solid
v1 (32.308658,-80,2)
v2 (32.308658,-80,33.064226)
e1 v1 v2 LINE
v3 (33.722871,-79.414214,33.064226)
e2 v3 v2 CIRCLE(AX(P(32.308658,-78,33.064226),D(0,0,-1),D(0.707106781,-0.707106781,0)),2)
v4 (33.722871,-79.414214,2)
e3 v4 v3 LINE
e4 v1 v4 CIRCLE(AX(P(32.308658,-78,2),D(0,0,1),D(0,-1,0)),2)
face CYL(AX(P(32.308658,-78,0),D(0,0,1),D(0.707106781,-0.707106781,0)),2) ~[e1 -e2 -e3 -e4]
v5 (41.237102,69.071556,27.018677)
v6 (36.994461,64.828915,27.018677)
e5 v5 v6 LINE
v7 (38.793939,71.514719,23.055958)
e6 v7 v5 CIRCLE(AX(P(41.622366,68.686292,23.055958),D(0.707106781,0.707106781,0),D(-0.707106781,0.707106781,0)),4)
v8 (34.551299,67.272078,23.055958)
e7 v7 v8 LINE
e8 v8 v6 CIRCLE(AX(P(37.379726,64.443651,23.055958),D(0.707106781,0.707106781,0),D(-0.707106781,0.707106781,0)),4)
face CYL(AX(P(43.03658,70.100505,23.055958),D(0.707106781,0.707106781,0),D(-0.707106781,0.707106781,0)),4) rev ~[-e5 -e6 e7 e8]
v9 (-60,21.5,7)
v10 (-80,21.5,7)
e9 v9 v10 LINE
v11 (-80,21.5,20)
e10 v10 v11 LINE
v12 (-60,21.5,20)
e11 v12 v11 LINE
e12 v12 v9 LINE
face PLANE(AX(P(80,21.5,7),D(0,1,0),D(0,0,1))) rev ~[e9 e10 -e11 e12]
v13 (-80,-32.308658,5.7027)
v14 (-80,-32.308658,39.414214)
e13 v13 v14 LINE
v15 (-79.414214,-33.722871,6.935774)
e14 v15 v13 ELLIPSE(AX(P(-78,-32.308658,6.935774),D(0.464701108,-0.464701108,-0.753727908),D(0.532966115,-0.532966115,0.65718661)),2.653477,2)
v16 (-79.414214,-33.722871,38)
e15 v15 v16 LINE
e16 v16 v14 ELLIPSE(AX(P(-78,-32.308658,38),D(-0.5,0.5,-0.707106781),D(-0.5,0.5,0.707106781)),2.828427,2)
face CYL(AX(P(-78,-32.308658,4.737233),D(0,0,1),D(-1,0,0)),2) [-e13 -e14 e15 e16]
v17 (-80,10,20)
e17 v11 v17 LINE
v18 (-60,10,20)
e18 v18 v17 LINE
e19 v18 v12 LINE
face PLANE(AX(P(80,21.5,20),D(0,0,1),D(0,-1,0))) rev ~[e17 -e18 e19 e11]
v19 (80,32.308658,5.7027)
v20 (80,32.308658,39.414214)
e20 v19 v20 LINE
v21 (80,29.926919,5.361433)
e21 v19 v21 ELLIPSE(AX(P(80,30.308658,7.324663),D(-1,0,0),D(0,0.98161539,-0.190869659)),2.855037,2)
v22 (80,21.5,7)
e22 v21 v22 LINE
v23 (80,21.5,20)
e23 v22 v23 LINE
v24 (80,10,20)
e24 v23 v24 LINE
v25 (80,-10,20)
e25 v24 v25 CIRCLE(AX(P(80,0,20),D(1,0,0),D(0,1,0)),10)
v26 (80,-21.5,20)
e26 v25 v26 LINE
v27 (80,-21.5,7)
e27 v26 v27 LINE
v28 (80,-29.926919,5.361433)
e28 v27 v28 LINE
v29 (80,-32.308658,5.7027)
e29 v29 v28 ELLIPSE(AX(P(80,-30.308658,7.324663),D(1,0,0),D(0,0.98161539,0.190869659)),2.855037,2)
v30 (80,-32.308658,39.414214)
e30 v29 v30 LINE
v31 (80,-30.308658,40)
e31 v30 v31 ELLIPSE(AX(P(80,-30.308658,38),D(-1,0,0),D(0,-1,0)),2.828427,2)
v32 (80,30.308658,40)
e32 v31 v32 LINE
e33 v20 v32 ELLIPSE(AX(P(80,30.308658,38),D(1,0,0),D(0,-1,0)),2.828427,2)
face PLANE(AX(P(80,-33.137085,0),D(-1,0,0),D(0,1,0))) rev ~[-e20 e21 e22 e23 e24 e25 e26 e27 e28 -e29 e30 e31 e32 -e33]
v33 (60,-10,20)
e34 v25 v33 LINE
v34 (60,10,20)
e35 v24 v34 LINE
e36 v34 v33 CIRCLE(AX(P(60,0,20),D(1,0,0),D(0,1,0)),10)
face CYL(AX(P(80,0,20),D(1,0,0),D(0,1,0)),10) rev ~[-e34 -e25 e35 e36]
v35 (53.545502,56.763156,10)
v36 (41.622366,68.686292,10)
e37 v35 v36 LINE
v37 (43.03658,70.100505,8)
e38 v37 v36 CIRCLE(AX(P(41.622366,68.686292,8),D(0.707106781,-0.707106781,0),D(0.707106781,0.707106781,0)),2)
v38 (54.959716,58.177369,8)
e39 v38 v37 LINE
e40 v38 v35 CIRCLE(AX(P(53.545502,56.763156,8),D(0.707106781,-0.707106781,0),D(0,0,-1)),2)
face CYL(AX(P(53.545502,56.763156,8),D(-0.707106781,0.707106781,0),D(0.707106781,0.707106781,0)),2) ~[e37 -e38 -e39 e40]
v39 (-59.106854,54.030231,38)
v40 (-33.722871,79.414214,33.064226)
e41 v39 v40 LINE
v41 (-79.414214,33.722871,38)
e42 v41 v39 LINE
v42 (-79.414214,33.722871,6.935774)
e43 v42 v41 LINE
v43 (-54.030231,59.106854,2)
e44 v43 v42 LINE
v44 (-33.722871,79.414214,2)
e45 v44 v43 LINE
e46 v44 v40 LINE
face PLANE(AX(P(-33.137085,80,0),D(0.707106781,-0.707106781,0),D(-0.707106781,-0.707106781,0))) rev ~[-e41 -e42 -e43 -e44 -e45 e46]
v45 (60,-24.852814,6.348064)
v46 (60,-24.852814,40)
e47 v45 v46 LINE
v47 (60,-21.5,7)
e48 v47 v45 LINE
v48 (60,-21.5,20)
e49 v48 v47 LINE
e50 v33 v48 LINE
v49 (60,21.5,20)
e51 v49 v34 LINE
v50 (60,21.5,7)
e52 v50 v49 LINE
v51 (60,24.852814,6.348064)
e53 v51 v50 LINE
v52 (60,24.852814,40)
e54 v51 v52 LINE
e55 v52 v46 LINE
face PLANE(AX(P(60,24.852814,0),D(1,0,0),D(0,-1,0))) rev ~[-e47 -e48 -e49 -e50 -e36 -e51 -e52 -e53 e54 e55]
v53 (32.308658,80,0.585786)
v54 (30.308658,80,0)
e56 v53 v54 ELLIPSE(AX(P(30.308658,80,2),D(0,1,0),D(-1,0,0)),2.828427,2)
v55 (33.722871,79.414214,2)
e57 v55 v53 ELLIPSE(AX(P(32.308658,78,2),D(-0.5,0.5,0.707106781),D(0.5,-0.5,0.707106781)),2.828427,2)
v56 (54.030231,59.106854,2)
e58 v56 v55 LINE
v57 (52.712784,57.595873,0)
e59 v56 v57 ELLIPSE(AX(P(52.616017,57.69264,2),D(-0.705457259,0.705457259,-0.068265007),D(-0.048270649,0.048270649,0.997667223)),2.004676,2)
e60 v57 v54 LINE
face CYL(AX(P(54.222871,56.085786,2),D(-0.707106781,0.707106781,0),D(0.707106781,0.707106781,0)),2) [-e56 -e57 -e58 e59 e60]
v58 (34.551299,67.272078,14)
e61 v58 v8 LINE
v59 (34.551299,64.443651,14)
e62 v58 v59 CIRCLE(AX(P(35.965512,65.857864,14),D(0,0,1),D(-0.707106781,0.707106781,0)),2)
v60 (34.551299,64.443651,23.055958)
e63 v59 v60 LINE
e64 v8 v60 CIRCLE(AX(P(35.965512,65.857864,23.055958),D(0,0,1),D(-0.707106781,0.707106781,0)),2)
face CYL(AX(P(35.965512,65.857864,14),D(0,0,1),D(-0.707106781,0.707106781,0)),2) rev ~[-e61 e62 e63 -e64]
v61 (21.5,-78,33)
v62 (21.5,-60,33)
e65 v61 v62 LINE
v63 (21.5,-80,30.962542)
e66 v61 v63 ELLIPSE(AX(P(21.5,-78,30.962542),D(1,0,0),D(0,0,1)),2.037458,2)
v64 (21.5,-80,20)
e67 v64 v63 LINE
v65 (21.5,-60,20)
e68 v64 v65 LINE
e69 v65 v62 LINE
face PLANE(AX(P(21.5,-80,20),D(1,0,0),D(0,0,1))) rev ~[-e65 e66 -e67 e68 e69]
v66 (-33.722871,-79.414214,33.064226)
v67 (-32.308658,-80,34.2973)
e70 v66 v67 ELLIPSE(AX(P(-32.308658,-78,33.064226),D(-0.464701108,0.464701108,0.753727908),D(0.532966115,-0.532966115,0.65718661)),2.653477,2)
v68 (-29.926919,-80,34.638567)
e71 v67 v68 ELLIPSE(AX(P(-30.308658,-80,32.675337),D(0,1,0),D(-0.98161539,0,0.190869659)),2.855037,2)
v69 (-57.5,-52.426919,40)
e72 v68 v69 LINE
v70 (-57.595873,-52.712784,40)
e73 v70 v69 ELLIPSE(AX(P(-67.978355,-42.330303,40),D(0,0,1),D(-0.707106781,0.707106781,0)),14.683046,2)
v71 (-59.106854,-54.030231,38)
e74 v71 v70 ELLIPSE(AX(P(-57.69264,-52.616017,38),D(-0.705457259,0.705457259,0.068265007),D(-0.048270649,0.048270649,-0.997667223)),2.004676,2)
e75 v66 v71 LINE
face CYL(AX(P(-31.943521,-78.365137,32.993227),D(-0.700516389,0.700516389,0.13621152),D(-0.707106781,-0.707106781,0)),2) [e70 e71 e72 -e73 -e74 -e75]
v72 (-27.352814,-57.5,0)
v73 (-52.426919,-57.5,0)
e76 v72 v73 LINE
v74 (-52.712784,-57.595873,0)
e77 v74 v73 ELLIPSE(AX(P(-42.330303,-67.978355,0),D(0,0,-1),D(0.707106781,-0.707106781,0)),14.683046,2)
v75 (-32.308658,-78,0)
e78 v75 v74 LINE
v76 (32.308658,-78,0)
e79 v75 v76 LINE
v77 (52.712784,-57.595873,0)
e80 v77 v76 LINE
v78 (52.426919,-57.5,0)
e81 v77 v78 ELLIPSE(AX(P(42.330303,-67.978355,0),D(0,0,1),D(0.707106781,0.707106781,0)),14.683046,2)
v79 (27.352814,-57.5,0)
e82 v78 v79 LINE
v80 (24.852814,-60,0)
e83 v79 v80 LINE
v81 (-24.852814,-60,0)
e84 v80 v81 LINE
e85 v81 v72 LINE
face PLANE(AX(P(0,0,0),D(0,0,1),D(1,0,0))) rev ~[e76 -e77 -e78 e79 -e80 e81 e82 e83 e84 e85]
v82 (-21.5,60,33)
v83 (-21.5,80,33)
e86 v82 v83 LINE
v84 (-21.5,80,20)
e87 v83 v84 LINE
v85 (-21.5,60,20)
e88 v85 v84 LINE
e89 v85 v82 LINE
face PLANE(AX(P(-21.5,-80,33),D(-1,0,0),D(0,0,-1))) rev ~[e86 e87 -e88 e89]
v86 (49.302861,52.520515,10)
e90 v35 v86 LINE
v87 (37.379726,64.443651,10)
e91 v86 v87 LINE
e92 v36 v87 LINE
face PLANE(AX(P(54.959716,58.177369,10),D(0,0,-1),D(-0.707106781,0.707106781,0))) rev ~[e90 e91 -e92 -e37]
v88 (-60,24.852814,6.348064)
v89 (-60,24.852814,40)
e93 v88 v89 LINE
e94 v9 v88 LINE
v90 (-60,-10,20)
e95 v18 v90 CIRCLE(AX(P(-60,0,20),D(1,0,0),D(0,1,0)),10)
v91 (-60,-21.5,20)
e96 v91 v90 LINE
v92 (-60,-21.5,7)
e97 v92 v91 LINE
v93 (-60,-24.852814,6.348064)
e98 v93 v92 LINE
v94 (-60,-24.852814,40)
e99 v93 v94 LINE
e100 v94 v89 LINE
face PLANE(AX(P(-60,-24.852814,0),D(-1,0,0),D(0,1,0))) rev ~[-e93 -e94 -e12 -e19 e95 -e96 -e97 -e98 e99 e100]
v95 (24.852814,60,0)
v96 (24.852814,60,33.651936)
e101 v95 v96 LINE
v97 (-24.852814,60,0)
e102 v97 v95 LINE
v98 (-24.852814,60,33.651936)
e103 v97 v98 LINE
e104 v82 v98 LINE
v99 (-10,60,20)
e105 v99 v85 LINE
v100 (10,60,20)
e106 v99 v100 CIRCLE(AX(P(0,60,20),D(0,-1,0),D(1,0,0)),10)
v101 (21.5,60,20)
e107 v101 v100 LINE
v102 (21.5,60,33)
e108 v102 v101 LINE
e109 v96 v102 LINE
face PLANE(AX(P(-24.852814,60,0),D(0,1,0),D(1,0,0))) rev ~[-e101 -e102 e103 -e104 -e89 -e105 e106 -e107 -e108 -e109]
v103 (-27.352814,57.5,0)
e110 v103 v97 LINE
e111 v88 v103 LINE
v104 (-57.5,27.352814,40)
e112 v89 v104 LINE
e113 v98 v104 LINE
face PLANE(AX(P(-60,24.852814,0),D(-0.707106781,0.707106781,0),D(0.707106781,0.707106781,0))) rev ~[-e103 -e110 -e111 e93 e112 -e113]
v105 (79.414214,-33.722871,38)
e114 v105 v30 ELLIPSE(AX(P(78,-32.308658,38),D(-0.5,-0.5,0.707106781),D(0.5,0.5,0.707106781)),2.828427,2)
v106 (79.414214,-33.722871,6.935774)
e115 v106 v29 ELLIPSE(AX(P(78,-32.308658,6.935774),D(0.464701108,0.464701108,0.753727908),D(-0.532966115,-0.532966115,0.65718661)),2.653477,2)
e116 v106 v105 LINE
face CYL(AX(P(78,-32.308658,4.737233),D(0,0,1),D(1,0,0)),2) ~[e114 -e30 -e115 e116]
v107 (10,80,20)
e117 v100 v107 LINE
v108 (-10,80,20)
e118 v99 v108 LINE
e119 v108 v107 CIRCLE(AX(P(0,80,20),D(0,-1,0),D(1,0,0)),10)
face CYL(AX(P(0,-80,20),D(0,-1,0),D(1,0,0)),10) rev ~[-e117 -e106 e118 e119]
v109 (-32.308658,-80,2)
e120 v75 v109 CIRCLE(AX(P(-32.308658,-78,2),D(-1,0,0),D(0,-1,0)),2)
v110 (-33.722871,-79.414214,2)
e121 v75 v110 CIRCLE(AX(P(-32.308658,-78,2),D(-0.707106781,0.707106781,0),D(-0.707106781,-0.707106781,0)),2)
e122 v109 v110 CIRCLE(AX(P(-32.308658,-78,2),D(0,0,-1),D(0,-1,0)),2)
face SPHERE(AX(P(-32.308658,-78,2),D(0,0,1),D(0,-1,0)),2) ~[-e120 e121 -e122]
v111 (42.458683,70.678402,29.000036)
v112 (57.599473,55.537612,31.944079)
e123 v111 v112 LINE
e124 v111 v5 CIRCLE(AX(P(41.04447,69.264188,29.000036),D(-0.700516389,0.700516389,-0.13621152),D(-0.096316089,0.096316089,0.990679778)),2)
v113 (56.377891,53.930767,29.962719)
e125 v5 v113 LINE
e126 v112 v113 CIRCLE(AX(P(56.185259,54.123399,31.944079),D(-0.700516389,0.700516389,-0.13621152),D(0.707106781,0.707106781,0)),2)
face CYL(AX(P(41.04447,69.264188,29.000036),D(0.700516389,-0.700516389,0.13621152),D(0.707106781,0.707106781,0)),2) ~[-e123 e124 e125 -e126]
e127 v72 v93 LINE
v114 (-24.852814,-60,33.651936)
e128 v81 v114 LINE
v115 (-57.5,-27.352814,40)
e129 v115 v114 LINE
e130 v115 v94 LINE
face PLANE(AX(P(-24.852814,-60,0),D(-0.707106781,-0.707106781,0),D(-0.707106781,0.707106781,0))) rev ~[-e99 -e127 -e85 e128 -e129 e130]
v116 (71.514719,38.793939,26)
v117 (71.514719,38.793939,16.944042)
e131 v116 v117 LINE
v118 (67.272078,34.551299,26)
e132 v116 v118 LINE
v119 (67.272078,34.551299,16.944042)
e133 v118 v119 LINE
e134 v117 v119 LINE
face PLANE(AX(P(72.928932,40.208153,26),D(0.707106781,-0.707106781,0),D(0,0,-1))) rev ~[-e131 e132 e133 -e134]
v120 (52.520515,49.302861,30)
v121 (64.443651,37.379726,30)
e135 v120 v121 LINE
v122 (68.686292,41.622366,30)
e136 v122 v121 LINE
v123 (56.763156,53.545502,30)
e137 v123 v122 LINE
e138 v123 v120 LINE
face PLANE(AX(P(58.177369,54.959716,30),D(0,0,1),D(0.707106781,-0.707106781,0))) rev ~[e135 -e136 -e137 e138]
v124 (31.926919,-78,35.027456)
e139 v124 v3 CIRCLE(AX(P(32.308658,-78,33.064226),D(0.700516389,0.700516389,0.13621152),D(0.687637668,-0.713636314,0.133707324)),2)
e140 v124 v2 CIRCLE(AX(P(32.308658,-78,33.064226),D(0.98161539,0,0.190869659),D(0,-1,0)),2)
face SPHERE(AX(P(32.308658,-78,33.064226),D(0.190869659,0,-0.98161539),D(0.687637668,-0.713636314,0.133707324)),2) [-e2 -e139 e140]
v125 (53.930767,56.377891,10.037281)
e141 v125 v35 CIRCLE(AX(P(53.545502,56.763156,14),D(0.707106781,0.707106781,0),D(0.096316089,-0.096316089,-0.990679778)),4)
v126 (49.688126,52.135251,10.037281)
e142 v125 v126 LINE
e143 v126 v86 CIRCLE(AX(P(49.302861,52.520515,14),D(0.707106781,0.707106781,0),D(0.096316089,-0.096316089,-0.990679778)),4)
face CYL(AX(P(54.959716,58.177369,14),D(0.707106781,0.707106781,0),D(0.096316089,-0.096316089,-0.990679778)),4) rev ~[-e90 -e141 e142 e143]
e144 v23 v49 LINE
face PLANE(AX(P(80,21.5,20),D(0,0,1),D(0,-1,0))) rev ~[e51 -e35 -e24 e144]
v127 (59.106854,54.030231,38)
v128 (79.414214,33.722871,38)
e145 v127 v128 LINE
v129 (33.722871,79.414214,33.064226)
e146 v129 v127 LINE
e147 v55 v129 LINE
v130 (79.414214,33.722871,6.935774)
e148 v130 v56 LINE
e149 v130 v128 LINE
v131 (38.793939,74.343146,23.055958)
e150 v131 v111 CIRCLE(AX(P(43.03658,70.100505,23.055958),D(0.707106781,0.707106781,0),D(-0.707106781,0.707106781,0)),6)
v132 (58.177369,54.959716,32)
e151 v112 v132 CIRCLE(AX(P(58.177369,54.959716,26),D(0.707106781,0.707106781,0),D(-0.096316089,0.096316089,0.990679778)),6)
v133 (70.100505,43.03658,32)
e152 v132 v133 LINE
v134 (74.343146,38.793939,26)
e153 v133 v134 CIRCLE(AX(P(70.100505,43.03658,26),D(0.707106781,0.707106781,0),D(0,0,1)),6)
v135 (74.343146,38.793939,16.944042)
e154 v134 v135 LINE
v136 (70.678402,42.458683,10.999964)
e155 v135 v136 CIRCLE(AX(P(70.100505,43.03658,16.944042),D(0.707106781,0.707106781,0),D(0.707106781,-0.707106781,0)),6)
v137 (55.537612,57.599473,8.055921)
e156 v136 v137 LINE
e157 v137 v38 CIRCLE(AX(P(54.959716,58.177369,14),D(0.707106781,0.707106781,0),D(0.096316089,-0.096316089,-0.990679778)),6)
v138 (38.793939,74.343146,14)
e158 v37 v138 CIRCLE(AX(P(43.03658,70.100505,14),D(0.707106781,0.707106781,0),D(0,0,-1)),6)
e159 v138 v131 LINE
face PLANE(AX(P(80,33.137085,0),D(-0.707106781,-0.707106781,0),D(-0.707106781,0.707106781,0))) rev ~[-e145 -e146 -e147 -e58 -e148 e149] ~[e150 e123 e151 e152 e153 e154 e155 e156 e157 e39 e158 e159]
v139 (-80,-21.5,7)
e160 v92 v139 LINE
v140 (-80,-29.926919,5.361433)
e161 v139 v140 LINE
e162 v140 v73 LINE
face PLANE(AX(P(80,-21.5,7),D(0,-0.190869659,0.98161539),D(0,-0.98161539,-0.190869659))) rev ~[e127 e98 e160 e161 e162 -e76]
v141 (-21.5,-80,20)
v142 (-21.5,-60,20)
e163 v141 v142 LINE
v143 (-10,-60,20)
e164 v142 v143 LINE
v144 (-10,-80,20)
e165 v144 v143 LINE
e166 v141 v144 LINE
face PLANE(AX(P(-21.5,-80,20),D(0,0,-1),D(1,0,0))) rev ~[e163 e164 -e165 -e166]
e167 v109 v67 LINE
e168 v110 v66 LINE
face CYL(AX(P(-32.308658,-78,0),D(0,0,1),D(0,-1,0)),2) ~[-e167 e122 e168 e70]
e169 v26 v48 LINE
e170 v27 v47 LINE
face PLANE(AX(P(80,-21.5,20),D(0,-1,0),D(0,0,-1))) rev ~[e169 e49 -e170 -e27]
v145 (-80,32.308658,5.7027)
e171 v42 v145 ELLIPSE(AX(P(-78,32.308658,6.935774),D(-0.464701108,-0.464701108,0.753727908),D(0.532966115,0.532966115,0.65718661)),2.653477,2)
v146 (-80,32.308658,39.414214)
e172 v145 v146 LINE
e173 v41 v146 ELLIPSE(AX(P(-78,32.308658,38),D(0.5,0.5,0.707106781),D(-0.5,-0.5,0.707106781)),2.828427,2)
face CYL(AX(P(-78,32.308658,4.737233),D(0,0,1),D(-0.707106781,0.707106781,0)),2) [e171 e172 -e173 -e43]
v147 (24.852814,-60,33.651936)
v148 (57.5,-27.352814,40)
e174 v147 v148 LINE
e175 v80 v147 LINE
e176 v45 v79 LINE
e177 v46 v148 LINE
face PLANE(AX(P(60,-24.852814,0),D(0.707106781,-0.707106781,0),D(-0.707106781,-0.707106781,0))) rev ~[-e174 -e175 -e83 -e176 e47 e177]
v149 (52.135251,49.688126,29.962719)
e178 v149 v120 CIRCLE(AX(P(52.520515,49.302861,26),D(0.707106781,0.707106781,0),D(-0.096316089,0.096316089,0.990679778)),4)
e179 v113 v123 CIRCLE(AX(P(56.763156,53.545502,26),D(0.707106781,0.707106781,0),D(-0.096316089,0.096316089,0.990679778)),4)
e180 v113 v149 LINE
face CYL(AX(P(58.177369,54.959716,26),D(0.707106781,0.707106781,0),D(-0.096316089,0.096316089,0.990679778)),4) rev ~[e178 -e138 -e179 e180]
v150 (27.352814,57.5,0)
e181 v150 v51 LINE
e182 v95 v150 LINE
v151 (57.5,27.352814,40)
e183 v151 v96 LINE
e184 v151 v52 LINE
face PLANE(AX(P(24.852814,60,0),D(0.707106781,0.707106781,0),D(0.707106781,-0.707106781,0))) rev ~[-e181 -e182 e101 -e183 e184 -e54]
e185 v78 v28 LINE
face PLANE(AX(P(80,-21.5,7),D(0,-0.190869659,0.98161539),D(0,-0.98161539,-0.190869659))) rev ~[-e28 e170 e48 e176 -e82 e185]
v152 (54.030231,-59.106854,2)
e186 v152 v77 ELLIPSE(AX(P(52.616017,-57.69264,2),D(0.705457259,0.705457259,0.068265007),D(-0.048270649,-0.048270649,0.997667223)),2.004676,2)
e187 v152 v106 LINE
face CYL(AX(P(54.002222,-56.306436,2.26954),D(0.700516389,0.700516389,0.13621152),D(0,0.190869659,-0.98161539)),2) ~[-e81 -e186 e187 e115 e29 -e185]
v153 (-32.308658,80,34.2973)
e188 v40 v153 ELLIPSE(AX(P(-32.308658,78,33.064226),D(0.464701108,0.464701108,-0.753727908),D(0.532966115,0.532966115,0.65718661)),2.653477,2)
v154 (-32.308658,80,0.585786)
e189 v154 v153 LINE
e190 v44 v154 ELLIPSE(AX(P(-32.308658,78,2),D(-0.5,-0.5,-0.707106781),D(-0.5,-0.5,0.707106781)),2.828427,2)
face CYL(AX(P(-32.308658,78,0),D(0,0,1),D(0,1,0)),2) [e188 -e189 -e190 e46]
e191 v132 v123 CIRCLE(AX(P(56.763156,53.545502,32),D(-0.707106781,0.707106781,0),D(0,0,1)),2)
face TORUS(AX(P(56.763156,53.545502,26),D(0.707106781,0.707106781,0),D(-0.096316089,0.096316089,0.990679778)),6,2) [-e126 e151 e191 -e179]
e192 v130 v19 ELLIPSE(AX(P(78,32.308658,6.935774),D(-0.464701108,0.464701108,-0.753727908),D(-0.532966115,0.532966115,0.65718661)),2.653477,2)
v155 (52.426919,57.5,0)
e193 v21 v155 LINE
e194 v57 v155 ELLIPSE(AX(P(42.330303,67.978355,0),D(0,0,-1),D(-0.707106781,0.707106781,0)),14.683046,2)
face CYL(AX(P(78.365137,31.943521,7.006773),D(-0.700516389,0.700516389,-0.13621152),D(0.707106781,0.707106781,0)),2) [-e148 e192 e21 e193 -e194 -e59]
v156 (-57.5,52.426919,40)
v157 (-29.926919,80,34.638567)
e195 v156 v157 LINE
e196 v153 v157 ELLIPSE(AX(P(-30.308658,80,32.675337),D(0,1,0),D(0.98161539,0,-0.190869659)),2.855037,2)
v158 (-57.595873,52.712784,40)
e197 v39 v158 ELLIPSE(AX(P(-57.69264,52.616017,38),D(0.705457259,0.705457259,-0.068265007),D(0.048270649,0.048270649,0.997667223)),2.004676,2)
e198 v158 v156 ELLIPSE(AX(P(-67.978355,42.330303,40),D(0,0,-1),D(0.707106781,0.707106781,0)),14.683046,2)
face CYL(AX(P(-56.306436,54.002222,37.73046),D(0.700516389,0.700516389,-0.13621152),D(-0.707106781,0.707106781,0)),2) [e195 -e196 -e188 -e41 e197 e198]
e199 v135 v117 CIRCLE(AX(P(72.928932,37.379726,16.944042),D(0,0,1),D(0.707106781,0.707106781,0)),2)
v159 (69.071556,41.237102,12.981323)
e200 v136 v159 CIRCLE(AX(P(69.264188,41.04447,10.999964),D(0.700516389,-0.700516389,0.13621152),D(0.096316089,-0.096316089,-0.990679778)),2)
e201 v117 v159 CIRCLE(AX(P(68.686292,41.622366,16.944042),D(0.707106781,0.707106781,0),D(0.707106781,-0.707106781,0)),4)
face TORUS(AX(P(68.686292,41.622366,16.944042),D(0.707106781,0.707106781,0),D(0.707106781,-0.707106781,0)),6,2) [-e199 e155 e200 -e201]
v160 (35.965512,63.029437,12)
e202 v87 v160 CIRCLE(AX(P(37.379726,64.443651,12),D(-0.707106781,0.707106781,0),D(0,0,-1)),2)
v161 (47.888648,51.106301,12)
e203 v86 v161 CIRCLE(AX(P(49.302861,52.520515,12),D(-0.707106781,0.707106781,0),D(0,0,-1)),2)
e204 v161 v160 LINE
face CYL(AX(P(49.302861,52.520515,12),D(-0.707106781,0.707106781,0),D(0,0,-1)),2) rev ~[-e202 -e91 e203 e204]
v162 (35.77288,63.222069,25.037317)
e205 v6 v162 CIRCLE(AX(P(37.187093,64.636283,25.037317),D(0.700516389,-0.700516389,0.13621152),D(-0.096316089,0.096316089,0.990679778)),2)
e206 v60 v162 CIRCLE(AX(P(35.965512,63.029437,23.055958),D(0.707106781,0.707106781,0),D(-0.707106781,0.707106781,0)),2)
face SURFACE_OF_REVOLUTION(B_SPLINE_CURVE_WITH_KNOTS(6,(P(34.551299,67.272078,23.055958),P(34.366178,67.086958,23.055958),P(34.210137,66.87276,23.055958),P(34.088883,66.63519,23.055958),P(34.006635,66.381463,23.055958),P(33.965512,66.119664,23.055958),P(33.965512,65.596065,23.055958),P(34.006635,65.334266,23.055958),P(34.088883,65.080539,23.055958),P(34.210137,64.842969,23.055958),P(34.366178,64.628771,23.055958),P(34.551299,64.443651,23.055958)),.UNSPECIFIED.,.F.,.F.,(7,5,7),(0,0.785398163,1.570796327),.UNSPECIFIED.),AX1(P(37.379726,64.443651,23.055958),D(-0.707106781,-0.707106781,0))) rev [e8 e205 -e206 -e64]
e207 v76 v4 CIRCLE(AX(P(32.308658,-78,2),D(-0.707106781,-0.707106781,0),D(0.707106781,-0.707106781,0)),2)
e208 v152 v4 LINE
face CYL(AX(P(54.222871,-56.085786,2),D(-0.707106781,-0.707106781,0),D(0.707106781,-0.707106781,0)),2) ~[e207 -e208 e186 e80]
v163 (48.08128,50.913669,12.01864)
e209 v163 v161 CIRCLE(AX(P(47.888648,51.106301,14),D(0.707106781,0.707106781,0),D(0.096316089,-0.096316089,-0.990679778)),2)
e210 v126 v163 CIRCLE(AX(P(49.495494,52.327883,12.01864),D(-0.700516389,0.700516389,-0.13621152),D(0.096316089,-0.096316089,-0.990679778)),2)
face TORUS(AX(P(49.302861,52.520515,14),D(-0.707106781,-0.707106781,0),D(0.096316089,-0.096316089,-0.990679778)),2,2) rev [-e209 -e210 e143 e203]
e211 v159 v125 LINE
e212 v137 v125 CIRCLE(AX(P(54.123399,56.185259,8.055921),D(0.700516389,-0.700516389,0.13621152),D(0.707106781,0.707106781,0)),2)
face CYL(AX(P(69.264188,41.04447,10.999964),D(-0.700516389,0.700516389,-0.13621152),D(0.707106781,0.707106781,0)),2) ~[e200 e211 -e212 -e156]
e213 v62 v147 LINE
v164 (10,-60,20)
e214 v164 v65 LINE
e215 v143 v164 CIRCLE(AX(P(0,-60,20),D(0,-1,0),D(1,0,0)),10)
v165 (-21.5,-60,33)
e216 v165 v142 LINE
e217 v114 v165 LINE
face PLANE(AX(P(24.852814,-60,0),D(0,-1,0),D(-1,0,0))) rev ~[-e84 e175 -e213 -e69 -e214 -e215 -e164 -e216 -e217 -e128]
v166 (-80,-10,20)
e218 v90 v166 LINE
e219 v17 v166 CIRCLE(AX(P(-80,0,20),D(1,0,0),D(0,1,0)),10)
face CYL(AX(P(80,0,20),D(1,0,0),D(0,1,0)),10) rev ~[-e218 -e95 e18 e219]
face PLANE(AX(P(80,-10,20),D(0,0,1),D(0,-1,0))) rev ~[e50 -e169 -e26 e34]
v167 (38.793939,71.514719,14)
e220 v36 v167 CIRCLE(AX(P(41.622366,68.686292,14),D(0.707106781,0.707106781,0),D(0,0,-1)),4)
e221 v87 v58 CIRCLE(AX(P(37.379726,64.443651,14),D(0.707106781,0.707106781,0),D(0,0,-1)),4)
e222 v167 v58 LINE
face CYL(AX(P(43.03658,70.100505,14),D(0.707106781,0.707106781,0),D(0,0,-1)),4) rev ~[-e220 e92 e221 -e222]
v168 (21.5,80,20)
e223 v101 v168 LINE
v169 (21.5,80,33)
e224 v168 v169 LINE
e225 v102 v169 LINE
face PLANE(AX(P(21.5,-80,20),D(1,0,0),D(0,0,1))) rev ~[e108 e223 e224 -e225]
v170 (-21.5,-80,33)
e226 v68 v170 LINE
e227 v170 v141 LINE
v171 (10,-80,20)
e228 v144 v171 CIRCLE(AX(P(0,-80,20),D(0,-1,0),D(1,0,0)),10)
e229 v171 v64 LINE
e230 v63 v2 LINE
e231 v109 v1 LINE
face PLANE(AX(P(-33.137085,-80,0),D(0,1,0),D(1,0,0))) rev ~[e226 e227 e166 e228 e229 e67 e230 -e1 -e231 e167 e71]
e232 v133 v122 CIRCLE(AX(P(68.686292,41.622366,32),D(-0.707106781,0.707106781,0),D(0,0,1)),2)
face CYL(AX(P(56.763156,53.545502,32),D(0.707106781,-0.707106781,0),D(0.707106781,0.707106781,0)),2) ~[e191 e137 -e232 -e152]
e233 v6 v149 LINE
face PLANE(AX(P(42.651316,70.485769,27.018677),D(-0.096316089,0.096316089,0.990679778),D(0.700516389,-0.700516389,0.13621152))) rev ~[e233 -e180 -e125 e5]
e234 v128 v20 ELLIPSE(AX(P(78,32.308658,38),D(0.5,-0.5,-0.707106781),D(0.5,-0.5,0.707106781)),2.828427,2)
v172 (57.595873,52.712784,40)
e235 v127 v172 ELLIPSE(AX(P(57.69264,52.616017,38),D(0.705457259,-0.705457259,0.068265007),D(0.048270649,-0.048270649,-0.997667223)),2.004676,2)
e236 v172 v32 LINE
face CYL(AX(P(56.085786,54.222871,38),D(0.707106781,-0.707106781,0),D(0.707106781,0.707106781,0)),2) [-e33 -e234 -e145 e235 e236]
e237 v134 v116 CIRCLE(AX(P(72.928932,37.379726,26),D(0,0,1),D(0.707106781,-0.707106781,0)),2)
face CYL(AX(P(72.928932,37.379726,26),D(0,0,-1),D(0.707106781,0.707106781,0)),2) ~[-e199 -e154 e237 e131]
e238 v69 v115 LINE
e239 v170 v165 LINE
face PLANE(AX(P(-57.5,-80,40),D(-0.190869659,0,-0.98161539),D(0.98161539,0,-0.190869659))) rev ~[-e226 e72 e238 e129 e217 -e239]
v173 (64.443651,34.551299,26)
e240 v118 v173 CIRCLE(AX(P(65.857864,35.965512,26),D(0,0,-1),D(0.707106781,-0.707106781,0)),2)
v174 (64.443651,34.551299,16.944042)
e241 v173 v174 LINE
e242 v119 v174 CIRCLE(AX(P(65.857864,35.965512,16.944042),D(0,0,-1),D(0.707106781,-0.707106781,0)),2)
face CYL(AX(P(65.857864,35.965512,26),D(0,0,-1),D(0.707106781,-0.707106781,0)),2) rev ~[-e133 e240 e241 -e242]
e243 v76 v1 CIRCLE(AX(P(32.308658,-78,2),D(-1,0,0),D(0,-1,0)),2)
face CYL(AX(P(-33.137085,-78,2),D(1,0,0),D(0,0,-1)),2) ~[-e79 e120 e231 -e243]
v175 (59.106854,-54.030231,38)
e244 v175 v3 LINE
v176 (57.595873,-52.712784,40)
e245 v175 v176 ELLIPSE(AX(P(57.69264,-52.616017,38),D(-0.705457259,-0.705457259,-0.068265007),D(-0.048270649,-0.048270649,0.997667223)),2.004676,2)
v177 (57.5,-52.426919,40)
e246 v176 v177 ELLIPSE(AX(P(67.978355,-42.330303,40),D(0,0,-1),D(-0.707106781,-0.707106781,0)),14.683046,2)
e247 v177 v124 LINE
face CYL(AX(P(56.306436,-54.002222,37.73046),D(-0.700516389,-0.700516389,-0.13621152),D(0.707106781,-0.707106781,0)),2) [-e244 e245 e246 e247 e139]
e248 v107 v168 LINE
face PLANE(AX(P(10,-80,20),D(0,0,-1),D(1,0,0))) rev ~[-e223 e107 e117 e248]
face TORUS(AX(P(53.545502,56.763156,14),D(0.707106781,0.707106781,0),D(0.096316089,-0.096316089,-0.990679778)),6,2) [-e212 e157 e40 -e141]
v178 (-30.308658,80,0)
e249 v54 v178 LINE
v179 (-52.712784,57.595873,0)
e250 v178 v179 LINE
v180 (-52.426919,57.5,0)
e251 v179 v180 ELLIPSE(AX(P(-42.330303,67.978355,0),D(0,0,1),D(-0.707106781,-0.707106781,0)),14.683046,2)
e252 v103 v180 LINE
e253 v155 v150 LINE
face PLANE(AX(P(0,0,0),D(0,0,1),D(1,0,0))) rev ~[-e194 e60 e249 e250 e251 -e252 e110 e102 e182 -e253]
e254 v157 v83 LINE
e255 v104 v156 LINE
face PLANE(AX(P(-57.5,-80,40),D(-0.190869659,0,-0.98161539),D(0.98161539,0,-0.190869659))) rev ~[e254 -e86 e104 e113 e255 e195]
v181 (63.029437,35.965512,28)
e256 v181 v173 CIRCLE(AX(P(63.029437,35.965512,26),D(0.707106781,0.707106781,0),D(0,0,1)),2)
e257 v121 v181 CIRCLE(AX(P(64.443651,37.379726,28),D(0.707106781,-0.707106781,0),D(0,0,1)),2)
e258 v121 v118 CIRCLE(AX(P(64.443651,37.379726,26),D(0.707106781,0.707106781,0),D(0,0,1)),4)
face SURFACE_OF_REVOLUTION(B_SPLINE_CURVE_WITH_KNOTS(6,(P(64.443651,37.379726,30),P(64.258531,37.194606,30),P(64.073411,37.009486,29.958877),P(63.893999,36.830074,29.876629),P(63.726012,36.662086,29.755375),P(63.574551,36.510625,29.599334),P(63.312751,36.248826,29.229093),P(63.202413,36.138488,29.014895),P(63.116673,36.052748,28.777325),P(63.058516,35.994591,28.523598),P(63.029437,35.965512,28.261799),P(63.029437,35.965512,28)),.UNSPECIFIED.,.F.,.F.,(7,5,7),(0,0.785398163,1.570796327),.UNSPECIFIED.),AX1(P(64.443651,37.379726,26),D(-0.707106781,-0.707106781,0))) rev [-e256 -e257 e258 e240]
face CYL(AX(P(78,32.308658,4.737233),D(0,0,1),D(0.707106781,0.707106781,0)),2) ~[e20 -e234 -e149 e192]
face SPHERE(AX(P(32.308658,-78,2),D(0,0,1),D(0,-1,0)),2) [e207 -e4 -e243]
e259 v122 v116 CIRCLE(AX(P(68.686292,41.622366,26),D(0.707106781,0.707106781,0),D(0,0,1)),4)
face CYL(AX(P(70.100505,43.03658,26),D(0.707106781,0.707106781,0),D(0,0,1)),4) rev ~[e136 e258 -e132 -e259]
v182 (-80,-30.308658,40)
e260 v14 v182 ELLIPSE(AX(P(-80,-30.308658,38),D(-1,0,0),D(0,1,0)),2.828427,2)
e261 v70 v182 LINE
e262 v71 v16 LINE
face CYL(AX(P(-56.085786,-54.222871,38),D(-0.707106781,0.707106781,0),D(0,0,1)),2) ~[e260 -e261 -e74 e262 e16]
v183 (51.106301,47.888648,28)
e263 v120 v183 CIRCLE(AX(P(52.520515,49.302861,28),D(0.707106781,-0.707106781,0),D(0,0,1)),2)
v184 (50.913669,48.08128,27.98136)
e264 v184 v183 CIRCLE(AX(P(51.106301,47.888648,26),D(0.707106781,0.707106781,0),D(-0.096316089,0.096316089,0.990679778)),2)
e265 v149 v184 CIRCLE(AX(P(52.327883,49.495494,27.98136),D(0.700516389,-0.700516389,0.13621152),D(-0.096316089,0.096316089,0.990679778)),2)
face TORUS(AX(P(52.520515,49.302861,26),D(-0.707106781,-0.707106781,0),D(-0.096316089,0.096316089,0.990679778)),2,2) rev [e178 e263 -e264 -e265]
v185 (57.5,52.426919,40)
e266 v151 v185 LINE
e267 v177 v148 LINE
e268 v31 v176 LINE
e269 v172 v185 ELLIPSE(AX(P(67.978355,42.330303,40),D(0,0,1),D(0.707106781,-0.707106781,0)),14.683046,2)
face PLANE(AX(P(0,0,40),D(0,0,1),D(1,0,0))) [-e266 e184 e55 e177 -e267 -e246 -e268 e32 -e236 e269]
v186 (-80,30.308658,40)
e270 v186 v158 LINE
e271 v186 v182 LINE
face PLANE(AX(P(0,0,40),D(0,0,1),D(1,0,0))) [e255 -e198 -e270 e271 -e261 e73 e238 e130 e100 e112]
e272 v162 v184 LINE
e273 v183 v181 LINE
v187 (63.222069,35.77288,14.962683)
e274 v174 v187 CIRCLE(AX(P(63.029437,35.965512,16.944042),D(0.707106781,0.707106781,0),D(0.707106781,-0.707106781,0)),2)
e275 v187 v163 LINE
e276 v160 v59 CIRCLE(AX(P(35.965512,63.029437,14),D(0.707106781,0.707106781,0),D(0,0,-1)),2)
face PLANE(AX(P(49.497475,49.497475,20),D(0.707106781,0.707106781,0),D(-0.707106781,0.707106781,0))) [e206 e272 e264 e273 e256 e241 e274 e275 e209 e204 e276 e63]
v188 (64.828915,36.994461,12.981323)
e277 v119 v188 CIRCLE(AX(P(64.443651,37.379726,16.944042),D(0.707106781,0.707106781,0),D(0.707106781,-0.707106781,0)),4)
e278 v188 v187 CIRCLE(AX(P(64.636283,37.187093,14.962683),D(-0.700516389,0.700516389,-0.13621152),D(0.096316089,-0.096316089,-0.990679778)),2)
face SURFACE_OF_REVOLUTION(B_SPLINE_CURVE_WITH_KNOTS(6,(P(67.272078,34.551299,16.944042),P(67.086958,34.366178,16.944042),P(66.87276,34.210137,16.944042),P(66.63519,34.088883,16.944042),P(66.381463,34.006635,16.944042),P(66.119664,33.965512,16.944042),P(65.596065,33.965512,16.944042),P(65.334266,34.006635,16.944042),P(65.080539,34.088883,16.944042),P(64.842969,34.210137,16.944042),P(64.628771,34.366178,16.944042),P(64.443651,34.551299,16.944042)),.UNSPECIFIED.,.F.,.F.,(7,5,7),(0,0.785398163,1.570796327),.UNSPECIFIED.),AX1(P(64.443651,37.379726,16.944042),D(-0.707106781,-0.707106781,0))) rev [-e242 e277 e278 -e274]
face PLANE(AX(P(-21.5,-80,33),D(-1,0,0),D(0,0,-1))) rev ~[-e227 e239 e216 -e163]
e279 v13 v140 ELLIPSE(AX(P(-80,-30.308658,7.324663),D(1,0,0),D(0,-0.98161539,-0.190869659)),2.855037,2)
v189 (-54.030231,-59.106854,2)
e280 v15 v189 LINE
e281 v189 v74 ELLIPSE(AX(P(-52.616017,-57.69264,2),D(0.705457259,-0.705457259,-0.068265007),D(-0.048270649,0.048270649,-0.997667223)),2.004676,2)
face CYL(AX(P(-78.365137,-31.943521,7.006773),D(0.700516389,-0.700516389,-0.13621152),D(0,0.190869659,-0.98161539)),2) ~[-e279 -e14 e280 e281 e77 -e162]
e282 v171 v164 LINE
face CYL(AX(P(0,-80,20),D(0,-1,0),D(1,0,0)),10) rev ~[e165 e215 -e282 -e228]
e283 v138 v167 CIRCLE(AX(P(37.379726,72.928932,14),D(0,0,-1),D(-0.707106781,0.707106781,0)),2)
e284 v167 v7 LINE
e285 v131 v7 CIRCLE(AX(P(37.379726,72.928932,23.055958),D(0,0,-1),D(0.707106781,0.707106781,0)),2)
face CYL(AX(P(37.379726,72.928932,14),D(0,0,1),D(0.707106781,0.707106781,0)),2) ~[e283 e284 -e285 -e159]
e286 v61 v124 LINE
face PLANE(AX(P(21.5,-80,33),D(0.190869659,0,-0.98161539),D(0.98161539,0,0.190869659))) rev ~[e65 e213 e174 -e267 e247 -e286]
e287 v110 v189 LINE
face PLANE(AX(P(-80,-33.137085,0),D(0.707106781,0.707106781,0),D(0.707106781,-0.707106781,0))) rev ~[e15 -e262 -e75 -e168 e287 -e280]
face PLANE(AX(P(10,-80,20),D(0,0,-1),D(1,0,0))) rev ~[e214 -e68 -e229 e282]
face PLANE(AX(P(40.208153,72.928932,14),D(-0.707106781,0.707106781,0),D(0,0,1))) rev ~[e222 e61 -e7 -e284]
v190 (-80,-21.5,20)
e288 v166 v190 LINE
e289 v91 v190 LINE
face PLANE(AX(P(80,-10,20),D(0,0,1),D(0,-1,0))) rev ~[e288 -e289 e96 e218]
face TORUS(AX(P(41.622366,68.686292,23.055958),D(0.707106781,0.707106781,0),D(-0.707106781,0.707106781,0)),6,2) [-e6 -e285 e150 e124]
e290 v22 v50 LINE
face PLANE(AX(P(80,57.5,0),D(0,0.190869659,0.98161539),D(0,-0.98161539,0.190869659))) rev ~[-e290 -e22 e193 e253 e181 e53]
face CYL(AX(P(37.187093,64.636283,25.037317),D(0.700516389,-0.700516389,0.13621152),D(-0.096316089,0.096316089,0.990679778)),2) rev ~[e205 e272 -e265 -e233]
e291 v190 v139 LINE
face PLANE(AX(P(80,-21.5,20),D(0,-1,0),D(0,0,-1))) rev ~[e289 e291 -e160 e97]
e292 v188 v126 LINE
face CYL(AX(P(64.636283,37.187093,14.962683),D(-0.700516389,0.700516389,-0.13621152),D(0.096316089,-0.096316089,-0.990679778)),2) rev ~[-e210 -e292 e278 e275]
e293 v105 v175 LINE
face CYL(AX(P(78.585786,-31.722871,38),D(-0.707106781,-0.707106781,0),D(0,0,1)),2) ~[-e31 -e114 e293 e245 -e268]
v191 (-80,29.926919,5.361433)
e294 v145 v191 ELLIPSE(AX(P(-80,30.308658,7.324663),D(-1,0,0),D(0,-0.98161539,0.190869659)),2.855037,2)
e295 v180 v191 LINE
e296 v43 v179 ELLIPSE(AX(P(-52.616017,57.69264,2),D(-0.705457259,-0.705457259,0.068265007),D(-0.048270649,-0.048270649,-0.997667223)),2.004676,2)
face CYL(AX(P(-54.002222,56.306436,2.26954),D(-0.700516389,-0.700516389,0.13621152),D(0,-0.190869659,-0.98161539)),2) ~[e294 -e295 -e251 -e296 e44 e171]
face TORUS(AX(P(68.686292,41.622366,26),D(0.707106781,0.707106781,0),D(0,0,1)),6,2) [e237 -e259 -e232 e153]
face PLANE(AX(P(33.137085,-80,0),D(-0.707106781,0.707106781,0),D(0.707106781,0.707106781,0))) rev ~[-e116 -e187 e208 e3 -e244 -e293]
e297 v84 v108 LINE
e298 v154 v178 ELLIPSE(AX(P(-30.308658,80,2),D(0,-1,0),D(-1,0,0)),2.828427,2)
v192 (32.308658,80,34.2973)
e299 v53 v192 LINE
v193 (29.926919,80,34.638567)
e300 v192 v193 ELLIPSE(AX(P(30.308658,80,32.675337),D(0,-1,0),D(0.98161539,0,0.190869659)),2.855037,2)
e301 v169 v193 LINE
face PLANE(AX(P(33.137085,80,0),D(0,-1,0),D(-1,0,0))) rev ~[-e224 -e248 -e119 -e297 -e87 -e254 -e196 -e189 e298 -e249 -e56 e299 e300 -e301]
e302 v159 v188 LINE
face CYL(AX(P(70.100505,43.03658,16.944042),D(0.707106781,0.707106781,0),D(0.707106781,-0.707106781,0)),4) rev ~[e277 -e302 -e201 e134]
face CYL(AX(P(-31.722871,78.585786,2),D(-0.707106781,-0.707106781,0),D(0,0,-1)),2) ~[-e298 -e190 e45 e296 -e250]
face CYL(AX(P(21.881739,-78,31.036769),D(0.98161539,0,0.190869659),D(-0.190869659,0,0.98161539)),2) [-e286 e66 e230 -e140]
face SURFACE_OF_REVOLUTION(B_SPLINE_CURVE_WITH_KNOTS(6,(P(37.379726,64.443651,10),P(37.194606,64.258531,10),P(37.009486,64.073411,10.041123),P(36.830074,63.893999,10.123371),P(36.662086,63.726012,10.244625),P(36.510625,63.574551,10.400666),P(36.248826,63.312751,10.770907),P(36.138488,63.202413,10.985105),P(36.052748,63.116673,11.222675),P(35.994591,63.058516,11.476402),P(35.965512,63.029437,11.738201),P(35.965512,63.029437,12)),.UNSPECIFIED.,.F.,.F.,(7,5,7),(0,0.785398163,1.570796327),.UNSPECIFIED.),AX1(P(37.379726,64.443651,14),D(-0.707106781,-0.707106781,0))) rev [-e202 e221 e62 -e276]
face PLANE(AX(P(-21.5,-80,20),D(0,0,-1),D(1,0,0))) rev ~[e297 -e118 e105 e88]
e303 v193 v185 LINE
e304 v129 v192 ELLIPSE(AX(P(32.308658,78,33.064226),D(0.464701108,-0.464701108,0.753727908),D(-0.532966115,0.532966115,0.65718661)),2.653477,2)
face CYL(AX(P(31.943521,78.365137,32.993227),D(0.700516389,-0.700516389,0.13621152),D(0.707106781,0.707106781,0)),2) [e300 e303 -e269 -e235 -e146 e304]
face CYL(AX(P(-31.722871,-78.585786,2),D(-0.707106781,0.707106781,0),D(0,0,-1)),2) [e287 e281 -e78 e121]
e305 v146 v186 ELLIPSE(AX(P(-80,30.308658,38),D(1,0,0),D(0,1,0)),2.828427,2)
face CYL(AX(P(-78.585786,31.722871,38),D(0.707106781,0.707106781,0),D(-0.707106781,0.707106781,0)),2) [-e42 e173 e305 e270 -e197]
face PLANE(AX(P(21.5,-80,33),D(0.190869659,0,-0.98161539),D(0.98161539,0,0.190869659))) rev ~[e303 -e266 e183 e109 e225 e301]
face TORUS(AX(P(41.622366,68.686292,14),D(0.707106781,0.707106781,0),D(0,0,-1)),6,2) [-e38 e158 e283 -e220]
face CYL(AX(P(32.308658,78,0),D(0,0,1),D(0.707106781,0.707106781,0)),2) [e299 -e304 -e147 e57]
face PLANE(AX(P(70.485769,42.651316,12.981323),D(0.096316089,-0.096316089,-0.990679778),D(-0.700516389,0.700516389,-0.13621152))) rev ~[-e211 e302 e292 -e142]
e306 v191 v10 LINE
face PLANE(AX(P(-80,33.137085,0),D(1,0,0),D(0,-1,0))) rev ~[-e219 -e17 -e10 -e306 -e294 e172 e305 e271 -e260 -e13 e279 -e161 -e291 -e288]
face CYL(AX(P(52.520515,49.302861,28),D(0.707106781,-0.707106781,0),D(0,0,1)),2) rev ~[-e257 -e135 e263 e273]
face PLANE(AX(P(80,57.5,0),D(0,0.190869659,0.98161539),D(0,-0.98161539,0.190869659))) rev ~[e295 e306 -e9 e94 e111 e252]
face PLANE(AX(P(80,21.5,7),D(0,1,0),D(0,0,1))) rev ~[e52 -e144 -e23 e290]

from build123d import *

# Parameters (mm, degrees)
F1_DEPTH      = 40
F2_R          = 10
F3_DEPTH      = 180
F3_DEPTH_BACK = 20
F4_R          = 10
F5_DEPTH      = 20
F5_DEPTH_BACK = 180
F7_DEPTH      = 181.4
F9_DEPTH      = 244.2
F11_DEPTH     = 10
F12_R         = 2
F13_R         = 2


# Not quite as in the source:
# - a feature names something its author has since deleted; it is built from what else it names


with BuildPart() as f1:
    # F0 (on Top) → F1 (new body)
    with BuildSketch(Plane.XY):
        Polygon((-33.1370849898, -80), (33.1370849898, -80), (80, -33.1370849898), (80, 33.1370849898), (33.1370849898, 80), (-33.1370849898, 80), (-80, 33.1370849898), (-80, -33.1370849898), align=None)
        Polygon((60, -24.8528137424), (24.8528137424, -60), (-24.8528137424, -60), (-60, -24.8528137424), (-60, 24.8528137424), (-24.8528137424, 60), (24.8528137424, 60), (60, 24.8528137424), align=None, mode=Mode.SUBTRACT)
    extrude(amount=F1_DEPTH)

    # F2 (on face) → F3 (cut, two sides)
    with BuildSketch(Plane.XZ.offset(80)) as f3_sk:
        with Locations((0, 20)):
            Circle(F2_R)
    extrude(amount=-F3_DEPTH, mode=Mode.SUBTRACT)
    extrude(f3_sk.sketch, amount=F3_DEPTH_BACK, mode=Mode.SUBTRACT)

    # F4 (on face) → F5 (cut, two sides)
    with BuildSketch(Plane.YZ.offset(80)) as f5_sk:
        with Locations((0, 20)):
            Circle(F4_R)
    extrude(amount=F5_DEPTH, mode=Mode.SUBTRACT)
    extrude(f5_sk.sketch, amount=-F5_DEPTH_BACK, mode=Mode.SUBTRACT)

    # F6 (on face) → F7 (cut)
    with BuildSketch(Plane.XZ.offset(80)):
        Polygon((-33.1370849898, 40), (0, 40), (0, 51.6958795488), (-57.5, 51.6958795488), (-71.9271823764, 52.9654417948), (-71.9271823764, 40), (-57.5, 40), (-33.1370849898, 35.2627665258), align=None)
        with BuildLine():
            Line((0, 40), (0, 30))
            ThreePointArc((0, 30), (7.0710678119, 27.0710678119), (10, 20))
            Line((10, 20), (21.5, 20))
            Line((21.5, 20), (21.5, 33))
            Line((21.5, 33), (33.1370849898, 35.2627665258))
            Line((33.1370849898, 35.2627665258), (33.1370849898, 40))
            Line((33.1370849898, 40), (0, 40))
        make_face()
        Polygon((0, 51.6958795488), (0, 40), (33.1370849898, 40), (33.1370849898, 35.2627665258), (57.5, 40), (71.9271823764, 40), (71.9271823764, 52.9654417948), (57.5, 51.6958795488), align=None)
        with BuildLine():
            Line((-21.5, 20), (-10, 20))
            ThreePointArc((-10, 20), (-7.0710678119, 27.0710678119), (0, 30))
            Line((0, 30), (0, 40))
            Line((0, 40), (-33.1370849898, 40))
            Line((-33.1370849898, 40), (-33.1370849898, 35.2627665258))
            Line((-33.1370849898, 35.2627665258), (-21.5, 33))
            Line((-21.5, 33), (-21.5, 20))
        make_face()
    extrude(amount=-F7_DEPTH, mode=Mode.SUBTRACT)

    # F8 (on face) → F9 (cut)
    with BuildSketch(Plane.YZ.offset(80)):
        Polygon((33.1370849898, 0), (0, 0), (0, -11.1064584926), (57.5, -11.1064584926), (66.6687613726, -11.8878306821), (66.6687613726, 0), (57.5, 0), (33.1370849898, 4.7372334742), align=None)
        with BuildLine():
            ThreePointArc((10, 20), (7.0710678119, 12.9289321881), (0, 10))
            Line((0, 10), (0, 0))
            Line((0, 0), (33.1370849898, 0))
            Line((33.1370849898, 0), (33.1370849898, 4.7372334742))
            Line((33.1370849898, 4.7372334742), (21.5, 7))
            Line((21.5, 7), (21.5, 20))
            Line((21.5, 20), (10, 20))
        make_face()
        with BuildLine():
            ThreePointArc((0, 10), (-7.0710678119, 12.9289321881), (-10, 20))
            Line((-10, 20), (-21.5, 20))
            Line((-21.5, 20), (-21.5, 7))
            Line((-21.5, 7), (-33.1370849898, 4.7372334742))
            Line((-33.1370849898, 4.7372334742), (-33.1370849898, 0))
            Line((-33.1370849898, 0), (0, 0))
            Line((0, 0), (0, 10))
        make_face()
        Polygon((0, -11.1064584926), (0, 0), (-33.1370849898, 0), (-33.1370849898, 4.7372334742), (-57.5, 0), (-66.6687613726, 0), (-66.6687613726, -11.8878306821), (-57.5, -11.1064584926), align=None)
    extrude(amount=-F9_DEPTH, mode=Mode.SUBTRACT)

    # F10 (on face) → F11 (cut)
    with BuildSketch(Plane(origin=(56.5685424949, 56.5685424949, 0), x_dir=(-0.7071067812, 0.7071067812, 0), z_dir=(0.7071067812, 0.7071067812, 0))):
        with BuildLine():
            Line((-19.68193107, 12.9813232565), (1.7303785257, 10.0372808895))
            ThreePointArc((1.7303785257, 10.0372808895), (2.0021645777, 10.0093311061), (2.2752246058, 10))
            Line((2.2752246058, 10), (19.1370849898, 10))
            ThreePointArc((19.1370849898, 10), (21.9655121146, 11.1715728753), (23.1370849898, 14))
            Line((23.1370849898, 14), (23.1370849898, 23.055957633))
            ThreePointArc((23.1370849898, 23.055957633), (22.1519966238, 25.6847040718), (19.68193107, 27.0186767435))
            Line((19.68193107, 27.0186767435), (-1.7303785257, 29.9627191105))
            ThreePointArc((-1.7303785257, 29.9627191105), (-2.0021645777, 29.9906688939), (-2.2752246058, 30))
            Line((-2.2752246058, 30), (-19.1370849898, 30))
            ThreePointArc((-19.1370849898, 30), (-21.9655121146, 28.8284271247), (-23.1370849898, 26))
            Line((-23.1370849898, 26), (-23.1370849898, 16.944042367))
            ThreePointArc((-23.1370849898, 16.944042367), (-22.1519966238, 14.3152959282), (-19.68193107, 12.9813232565))
        make_face()
    extrude(amount=-F11_DEPTH, mode=Mode.SUBTRACT)

    # F12
    f12_edges = [f1.edges().sort_by_distance(p)[0] for p in [
        (33.137085, 65.857864, 18.527979),
        (33.965512, 65.029437, 11.171573),
        (41.92708, 57.067869, 10),
    ]]
    fillet(f12_edges, radius=F12_R)

    # F13
    f13_edges = [f1.edges().sort_by_distance(p)[0] for p in [
        (44.387085, 68.75, 0),
        (67.818542, 45.318542, 2.368617),
        (33.137085, 80, 17.631383),
        (45.318542, 67.818542, 37.631383),
        (80, 33.137085, 22.368617),
        (68.75, 44.387085, 40),
        (72.100505, 41.03658, 28.828427),
        (64.138937, 48.998148, 30),
        (57.984287, 55.152798, 29.990669),
        (50.22171, 62.915375, 28.490698),
        (40.904715, 72.23237, 25.684704),
        (40.208153, 72.928932, 18.527979),
        (41.03658, 72.100505, 11.171573),
        (48.998148, 64.138937, 10),
        (55.152798, 57.984287, 10.009331),
        (62.915375, 50.22171, 11.509302),
        (72.23237, 40.904715, 14.315296),
        (72.928932, 40.208153, 21.472021),
        (44.387085, -68.75, 0),
        (33.137085, -80, 17.631383),
        (45.318542, -67.818542, 37.631383),
        (68.75, -44.387085, 40),
        (80, -33.137085, 22.368617),
        (67.818542, -45.318542, 2.368617),
        (0, -80, 0),
        (27.318542, -80, 34.131383),
        (-44.387085, -68.75, 0),
        (-67.818542, -45.318542, 2.368617),
        (-80, -33.137085, 22.368617),
        (-68.75, -44.387085, 40),
        (-45.318542, -67.818542, 37.631383),
        (-33.137085, -80, 17.631383),
        (-44.387085, 68.75, 0),
        (-33.137085, 80, 17.631383),
        (-45.318542, 67.818542, 37.631383),
        (-68.75, 44.387085, 40),
        (-80, 33.137085, 22.368617),
        (-67.818542, 45.318542, 2.368617),
    ]]
    fillet(f13_edges, radius=F13_R)


solid = f1.part
